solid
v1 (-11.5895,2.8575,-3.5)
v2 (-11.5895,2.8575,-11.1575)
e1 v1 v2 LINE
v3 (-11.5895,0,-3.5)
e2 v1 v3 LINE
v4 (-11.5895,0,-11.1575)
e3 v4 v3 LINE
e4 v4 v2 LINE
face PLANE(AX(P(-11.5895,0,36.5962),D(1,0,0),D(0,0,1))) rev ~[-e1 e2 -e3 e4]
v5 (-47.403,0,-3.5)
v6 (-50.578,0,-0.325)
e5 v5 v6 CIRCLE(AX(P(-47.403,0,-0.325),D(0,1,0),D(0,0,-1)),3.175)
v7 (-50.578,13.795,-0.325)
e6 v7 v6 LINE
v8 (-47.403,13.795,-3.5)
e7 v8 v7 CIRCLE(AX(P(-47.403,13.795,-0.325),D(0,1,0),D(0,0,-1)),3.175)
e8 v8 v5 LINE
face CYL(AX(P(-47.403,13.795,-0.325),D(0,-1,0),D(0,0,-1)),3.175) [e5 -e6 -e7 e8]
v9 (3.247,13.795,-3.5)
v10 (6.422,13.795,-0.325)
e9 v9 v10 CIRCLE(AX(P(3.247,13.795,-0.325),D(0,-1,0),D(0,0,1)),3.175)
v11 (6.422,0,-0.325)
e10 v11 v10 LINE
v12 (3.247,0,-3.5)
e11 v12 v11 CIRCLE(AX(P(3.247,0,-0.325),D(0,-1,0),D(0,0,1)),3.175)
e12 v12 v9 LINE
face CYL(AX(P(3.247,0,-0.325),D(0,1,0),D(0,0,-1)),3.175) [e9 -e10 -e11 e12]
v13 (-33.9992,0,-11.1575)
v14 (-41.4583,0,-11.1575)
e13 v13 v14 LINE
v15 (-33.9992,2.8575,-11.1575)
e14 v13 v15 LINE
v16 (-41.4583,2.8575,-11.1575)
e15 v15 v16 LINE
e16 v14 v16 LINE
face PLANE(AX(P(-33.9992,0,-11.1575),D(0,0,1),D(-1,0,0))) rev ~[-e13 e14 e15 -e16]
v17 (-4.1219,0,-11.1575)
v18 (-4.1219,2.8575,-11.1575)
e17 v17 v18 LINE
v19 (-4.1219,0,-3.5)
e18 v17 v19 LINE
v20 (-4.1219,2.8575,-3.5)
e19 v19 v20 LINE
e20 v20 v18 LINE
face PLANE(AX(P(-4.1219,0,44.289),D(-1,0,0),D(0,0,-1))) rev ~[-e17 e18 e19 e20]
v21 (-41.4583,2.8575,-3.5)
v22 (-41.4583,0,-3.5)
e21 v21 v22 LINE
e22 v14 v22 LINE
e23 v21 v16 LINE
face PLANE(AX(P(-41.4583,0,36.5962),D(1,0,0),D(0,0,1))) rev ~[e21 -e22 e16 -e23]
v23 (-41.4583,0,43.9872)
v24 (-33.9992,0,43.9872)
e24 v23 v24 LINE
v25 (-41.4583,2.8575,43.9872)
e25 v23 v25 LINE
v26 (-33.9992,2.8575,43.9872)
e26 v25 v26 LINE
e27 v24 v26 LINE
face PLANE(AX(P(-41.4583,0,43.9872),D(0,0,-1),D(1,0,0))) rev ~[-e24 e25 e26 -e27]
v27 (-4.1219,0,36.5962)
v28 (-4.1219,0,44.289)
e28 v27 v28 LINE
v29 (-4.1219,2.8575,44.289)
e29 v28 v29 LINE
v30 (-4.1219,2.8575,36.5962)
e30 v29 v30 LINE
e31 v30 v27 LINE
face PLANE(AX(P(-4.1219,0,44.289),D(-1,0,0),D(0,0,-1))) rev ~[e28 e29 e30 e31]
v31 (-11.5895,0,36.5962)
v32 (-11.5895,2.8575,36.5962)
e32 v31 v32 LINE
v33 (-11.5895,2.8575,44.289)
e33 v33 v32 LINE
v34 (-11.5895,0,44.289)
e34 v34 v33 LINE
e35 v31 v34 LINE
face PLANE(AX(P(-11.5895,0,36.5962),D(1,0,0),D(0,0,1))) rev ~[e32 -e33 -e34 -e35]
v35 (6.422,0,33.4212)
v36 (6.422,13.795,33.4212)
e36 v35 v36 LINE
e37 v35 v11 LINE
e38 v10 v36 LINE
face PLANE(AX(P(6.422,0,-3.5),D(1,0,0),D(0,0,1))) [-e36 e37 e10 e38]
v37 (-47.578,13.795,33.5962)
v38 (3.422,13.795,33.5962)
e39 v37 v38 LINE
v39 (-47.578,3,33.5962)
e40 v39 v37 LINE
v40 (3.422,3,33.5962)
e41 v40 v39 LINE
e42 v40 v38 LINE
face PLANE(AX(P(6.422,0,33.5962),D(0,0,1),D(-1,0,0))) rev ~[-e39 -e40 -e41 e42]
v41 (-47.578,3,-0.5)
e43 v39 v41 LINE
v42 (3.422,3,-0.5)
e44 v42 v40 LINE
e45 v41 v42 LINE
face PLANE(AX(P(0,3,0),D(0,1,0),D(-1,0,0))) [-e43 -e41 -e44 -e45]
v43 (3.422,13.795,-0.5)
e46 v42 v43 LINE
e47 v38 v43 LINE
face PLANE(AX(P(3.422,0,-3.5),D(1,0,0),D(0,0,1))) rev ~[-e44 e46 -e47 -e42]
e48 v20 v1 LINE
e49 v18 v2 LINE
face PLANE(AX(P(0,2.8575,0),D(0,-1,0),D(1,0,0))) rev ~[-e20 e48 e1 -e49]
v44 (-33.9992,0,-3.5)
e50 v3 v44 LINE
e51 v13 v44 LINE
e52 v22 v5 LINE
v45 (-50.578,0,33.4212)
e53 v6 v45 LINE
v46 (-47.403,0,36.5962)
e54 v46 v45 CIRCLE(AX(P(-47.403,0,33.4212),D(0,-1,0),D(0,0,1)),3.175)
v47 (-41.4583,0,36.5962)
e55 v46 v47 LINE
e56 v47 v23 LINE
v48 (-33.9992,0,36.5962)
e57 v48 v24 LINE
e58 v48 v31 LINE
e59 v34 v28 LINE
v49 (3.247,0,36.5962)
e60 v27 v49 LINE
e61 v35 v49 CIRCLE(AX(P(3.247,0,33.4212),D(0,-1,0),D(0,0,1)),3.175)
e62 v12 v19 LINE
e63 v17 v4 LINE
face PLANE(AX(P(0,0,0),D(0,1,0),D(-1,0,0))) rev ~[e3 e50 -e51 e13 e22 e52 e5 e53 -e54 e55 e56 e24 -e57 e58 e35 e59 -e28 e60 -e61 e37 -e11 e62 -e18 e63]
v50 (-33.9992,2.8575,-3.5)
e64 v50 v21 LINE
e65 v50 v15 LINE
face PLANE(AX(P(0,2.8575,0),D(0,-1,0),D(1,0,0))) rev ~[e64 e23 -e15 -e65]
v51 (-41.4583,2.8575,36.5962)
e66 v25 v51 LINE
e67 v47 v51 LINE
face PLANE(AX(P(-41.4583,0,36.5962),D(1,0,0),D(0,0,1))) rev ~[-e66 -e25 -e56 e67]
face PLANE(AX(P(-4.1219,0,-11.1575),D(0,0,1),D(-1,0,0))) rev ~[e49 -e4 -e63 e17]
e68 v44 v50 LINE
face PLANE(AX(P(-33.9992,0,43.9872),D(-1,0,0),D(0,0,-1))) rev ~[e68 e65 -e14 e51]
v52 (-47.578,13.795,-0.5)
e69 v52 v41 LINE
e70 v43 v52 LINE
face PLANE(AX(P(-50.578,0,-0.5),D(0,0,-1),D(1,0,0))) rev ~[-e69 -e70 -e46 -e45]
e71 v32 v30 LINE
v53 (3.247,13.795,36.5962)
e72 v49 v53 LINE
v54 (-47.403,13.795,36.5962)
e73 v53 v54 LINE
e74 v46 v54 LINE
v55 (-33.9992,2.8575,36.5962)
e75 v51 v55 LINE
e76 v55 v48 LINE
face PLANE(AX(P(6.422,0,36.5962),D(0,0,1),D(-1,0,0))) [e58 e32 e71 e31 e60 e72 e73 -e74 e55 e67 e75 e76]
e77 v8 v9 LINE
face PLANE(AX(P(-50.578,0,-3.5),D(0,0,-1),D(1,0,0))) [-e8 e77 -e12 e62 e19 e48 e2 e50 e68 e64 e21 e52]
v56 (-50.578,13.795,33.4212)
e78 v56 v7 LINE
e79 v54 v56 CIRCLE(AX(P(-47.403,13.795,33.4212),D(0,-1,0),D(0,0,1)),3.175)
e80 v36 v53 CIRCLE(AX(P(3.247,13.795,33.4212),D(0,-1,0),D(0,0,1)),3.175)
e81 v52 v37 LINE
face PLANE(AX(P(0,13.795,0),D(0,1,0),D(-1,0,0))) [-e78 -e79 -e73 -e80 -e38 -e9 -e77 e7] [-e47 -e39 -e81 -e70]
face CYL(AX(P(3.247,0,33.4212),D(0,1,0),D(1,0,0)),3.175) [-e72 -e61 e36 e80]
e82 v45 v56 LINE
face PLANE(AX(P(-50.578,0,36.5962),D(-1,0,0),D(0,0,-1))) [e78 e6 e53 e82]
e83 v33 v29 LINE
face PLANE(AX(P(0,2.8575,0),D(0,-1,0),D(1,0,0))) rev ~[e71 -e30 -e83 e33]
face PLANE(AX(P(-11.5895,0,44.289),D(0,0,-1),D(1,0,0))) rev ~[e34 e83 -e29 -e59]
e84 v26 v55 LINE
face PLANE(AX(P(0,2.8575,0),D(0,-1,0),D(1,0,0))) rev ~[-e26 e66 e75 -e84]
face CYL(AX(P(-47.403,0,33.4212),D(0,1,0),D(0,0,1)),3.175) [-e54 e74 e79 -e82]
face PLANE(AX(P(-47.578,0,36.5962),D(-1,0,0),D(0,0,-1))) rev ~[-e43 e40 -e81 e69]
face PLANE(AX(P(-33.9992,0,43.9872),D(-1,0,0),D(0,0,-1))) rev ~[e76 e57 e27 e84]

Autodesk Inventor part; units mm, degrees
ref_plane "YZ Plane" through (0, 0, 0) normal (1, 0, 0) x (0, 1, 0)
ref_plane "XZ Plane" through (0, 0, 0) normal (0, 1, 0) x (-1, 0, 0)
sketch "Sketch1" plane through (0, 0, 0) normal (0, 1, 0) x (-1, 0, 0)
  line L0 (-2.922, 0) -> (47.078, 0)
  line L1 (47.078, 0) -> (47.078, 33.0962)
  line L2 (47.078, 33.0962) -> (-2.922, 33.0962)
  line L3 (-2.922, 33.0962) -> (-2.922, 0)
  line L4 (50.578, 36.5962) -> (50.578, -3.5)
  line L5 (50.578, -3.5) -> (-6.422, -3.5)
  line L6 (-6.422, -3.5) -> (-6.422, 36.5962)
  line L7 (-6.422, 36.5962) -> (50.578, 36.5962)
  point P0 (0, 0)
  dimension "d0" = 50
  dimension "d1" = 33.0962
  dimension "d2" = 3.5
extrude "Extrusion1" add sketch "Sketch1" along normal blind 13.97 contours L3 L2 L1 L0 | L4 L5 L6 L7
shell "Shell1" thickness 3 removed faces 0
sketch "Sketch2" plane through (0, 13.97, 0) normal (0, 1, 0) x (1, 0, 0)
  point P0 (0, 0)
move faces "Move1" translate (0, -3.175, 0) faces at (-12.578, 13.97, 23.2308)
move faces "Move2" translate (0, 3, 0) faces at (-13.578, 10.795, 35.5962)
fillet "Fillet1" radius 3.175 4 edges at (6.422, 6.8975, 36.5962) (6.422, 6.8975, -3.5) (-50.578, 6.8975, -3.5) (-50.578, 6.8975, 36.5962)
ref_plane "Work Plane1" through (-47.403, 13.795, 36.5962) normal (0, 1, 0) x (1, 0, 0)
sketch "Sketch3" plane through (-47.403, 13.795, 36.5962) normal (0, 1, 0) x (1, 0, 0)
  arc A0 (-3.175, 3.175) -> (0, 0) centre (0, 3.175) ccw projected
  line L0 (0, 0) -> (50.65, 0) projected
  arc A1 (50.65, 0) -> (53.825, 3.175) centre (50.65, 3.175) ccw projected
  line L1 (53.825, 3.175) -> (53.825, 36.9212) projected
  arc A2 (53.825, 36.9212) -> (50.65, 40.0962) centre (50.65, 36.9212) ccw projected
  line L2 (50.65, 40.0962) -> (0, 40.0962) projected
  arc A3 (0, 40.0962) -> (-3.175, 36.9212) centre (0, 36.9212) ccw projected
  line L3 (-3.175, 36.9212) -> (-3.175, 3.175) projected
  line L4 (50.825, 3) -> (-0.175, 3) projected
  line L5 (-0.175, 3) -> (-0.175, 37.0962) projected
  line L6 (-0.175, 37.0962) -> (50.825, 37.0962) projected
  line L7 (50.825, 37.0962) -> (50.825, 3) projected
  point P0 (47.403, 36.5962)
sketch "Sketch4" plane through (0, 0, 0) normal (0, -1, 0) x (1, 0, 0)
  arc A0 (-50.578, 33.4212) -> (-47.403, 36.5962) centre (-47.403, 33.4212) ccw projected
  line L0 (-50.578, -0.325) -> (-50.578, 33.4212) projected
  arc A1 (-47.403, -3.5) -> (-50.578, -0.325) centre (-47.403, -0.325) ccw projected
  line L1 (3.247, -3.5) -> (-47.403, -3.5)
  arc A2 (6.422, -0.325) -> (3.247, -3.5) centre (3.247, -0.325) ccw projected
  line L2 (6.422, 33.4212) -> (6.422, -0.325) projected
  arc A3 (3.247, 36.5962) -> (6.422, 33.4212) centre (3.247, 33.4212) ccw projected
  line L3 (-47.403, 36.5962) -> (3.247, 36.5962)
  line L4 (-41.4583, 43.9872) -> (-33.9992, 43.9872)
  line L5 (-33.9992, 43.9872) -> (-33.9992, -11.1575)
  line L6 (-33.9992, -11.1575) -> (-41.4583, -11.1575)
  line L7 (-41.4583, -11.1575) -> (-41.4583, 43.9872)
  line L8 (-11.5895, 44.289) -> (-4.1219, 44.289)
  line L9 (-4.1219, 44.289) -> (-4.1219, -11.1575)
  line L10 (-4.1219, -11.1575) -> (-11.5895, -11.1575)
  line L11 (-11.5895, -11.1575) -> (-11.5895, 44.289)
  point P0 (0, 0)
  dimension "d15" = 7.4591
  dimension "d16" = 55.1447
  dimension "d17" = 7.4676
extrude "Extrusion2" add sketch "Sketch4" against normal blind 2.8575 contours L7 L4 L5 L3 | L3 L5 L1 L7 | L1 L5 L6 L7 | L11 L8 L9 L3 | L3 L9 L1 L11 | L1 L9 L10 L11
properties part number "Gyro_box_bottom"
